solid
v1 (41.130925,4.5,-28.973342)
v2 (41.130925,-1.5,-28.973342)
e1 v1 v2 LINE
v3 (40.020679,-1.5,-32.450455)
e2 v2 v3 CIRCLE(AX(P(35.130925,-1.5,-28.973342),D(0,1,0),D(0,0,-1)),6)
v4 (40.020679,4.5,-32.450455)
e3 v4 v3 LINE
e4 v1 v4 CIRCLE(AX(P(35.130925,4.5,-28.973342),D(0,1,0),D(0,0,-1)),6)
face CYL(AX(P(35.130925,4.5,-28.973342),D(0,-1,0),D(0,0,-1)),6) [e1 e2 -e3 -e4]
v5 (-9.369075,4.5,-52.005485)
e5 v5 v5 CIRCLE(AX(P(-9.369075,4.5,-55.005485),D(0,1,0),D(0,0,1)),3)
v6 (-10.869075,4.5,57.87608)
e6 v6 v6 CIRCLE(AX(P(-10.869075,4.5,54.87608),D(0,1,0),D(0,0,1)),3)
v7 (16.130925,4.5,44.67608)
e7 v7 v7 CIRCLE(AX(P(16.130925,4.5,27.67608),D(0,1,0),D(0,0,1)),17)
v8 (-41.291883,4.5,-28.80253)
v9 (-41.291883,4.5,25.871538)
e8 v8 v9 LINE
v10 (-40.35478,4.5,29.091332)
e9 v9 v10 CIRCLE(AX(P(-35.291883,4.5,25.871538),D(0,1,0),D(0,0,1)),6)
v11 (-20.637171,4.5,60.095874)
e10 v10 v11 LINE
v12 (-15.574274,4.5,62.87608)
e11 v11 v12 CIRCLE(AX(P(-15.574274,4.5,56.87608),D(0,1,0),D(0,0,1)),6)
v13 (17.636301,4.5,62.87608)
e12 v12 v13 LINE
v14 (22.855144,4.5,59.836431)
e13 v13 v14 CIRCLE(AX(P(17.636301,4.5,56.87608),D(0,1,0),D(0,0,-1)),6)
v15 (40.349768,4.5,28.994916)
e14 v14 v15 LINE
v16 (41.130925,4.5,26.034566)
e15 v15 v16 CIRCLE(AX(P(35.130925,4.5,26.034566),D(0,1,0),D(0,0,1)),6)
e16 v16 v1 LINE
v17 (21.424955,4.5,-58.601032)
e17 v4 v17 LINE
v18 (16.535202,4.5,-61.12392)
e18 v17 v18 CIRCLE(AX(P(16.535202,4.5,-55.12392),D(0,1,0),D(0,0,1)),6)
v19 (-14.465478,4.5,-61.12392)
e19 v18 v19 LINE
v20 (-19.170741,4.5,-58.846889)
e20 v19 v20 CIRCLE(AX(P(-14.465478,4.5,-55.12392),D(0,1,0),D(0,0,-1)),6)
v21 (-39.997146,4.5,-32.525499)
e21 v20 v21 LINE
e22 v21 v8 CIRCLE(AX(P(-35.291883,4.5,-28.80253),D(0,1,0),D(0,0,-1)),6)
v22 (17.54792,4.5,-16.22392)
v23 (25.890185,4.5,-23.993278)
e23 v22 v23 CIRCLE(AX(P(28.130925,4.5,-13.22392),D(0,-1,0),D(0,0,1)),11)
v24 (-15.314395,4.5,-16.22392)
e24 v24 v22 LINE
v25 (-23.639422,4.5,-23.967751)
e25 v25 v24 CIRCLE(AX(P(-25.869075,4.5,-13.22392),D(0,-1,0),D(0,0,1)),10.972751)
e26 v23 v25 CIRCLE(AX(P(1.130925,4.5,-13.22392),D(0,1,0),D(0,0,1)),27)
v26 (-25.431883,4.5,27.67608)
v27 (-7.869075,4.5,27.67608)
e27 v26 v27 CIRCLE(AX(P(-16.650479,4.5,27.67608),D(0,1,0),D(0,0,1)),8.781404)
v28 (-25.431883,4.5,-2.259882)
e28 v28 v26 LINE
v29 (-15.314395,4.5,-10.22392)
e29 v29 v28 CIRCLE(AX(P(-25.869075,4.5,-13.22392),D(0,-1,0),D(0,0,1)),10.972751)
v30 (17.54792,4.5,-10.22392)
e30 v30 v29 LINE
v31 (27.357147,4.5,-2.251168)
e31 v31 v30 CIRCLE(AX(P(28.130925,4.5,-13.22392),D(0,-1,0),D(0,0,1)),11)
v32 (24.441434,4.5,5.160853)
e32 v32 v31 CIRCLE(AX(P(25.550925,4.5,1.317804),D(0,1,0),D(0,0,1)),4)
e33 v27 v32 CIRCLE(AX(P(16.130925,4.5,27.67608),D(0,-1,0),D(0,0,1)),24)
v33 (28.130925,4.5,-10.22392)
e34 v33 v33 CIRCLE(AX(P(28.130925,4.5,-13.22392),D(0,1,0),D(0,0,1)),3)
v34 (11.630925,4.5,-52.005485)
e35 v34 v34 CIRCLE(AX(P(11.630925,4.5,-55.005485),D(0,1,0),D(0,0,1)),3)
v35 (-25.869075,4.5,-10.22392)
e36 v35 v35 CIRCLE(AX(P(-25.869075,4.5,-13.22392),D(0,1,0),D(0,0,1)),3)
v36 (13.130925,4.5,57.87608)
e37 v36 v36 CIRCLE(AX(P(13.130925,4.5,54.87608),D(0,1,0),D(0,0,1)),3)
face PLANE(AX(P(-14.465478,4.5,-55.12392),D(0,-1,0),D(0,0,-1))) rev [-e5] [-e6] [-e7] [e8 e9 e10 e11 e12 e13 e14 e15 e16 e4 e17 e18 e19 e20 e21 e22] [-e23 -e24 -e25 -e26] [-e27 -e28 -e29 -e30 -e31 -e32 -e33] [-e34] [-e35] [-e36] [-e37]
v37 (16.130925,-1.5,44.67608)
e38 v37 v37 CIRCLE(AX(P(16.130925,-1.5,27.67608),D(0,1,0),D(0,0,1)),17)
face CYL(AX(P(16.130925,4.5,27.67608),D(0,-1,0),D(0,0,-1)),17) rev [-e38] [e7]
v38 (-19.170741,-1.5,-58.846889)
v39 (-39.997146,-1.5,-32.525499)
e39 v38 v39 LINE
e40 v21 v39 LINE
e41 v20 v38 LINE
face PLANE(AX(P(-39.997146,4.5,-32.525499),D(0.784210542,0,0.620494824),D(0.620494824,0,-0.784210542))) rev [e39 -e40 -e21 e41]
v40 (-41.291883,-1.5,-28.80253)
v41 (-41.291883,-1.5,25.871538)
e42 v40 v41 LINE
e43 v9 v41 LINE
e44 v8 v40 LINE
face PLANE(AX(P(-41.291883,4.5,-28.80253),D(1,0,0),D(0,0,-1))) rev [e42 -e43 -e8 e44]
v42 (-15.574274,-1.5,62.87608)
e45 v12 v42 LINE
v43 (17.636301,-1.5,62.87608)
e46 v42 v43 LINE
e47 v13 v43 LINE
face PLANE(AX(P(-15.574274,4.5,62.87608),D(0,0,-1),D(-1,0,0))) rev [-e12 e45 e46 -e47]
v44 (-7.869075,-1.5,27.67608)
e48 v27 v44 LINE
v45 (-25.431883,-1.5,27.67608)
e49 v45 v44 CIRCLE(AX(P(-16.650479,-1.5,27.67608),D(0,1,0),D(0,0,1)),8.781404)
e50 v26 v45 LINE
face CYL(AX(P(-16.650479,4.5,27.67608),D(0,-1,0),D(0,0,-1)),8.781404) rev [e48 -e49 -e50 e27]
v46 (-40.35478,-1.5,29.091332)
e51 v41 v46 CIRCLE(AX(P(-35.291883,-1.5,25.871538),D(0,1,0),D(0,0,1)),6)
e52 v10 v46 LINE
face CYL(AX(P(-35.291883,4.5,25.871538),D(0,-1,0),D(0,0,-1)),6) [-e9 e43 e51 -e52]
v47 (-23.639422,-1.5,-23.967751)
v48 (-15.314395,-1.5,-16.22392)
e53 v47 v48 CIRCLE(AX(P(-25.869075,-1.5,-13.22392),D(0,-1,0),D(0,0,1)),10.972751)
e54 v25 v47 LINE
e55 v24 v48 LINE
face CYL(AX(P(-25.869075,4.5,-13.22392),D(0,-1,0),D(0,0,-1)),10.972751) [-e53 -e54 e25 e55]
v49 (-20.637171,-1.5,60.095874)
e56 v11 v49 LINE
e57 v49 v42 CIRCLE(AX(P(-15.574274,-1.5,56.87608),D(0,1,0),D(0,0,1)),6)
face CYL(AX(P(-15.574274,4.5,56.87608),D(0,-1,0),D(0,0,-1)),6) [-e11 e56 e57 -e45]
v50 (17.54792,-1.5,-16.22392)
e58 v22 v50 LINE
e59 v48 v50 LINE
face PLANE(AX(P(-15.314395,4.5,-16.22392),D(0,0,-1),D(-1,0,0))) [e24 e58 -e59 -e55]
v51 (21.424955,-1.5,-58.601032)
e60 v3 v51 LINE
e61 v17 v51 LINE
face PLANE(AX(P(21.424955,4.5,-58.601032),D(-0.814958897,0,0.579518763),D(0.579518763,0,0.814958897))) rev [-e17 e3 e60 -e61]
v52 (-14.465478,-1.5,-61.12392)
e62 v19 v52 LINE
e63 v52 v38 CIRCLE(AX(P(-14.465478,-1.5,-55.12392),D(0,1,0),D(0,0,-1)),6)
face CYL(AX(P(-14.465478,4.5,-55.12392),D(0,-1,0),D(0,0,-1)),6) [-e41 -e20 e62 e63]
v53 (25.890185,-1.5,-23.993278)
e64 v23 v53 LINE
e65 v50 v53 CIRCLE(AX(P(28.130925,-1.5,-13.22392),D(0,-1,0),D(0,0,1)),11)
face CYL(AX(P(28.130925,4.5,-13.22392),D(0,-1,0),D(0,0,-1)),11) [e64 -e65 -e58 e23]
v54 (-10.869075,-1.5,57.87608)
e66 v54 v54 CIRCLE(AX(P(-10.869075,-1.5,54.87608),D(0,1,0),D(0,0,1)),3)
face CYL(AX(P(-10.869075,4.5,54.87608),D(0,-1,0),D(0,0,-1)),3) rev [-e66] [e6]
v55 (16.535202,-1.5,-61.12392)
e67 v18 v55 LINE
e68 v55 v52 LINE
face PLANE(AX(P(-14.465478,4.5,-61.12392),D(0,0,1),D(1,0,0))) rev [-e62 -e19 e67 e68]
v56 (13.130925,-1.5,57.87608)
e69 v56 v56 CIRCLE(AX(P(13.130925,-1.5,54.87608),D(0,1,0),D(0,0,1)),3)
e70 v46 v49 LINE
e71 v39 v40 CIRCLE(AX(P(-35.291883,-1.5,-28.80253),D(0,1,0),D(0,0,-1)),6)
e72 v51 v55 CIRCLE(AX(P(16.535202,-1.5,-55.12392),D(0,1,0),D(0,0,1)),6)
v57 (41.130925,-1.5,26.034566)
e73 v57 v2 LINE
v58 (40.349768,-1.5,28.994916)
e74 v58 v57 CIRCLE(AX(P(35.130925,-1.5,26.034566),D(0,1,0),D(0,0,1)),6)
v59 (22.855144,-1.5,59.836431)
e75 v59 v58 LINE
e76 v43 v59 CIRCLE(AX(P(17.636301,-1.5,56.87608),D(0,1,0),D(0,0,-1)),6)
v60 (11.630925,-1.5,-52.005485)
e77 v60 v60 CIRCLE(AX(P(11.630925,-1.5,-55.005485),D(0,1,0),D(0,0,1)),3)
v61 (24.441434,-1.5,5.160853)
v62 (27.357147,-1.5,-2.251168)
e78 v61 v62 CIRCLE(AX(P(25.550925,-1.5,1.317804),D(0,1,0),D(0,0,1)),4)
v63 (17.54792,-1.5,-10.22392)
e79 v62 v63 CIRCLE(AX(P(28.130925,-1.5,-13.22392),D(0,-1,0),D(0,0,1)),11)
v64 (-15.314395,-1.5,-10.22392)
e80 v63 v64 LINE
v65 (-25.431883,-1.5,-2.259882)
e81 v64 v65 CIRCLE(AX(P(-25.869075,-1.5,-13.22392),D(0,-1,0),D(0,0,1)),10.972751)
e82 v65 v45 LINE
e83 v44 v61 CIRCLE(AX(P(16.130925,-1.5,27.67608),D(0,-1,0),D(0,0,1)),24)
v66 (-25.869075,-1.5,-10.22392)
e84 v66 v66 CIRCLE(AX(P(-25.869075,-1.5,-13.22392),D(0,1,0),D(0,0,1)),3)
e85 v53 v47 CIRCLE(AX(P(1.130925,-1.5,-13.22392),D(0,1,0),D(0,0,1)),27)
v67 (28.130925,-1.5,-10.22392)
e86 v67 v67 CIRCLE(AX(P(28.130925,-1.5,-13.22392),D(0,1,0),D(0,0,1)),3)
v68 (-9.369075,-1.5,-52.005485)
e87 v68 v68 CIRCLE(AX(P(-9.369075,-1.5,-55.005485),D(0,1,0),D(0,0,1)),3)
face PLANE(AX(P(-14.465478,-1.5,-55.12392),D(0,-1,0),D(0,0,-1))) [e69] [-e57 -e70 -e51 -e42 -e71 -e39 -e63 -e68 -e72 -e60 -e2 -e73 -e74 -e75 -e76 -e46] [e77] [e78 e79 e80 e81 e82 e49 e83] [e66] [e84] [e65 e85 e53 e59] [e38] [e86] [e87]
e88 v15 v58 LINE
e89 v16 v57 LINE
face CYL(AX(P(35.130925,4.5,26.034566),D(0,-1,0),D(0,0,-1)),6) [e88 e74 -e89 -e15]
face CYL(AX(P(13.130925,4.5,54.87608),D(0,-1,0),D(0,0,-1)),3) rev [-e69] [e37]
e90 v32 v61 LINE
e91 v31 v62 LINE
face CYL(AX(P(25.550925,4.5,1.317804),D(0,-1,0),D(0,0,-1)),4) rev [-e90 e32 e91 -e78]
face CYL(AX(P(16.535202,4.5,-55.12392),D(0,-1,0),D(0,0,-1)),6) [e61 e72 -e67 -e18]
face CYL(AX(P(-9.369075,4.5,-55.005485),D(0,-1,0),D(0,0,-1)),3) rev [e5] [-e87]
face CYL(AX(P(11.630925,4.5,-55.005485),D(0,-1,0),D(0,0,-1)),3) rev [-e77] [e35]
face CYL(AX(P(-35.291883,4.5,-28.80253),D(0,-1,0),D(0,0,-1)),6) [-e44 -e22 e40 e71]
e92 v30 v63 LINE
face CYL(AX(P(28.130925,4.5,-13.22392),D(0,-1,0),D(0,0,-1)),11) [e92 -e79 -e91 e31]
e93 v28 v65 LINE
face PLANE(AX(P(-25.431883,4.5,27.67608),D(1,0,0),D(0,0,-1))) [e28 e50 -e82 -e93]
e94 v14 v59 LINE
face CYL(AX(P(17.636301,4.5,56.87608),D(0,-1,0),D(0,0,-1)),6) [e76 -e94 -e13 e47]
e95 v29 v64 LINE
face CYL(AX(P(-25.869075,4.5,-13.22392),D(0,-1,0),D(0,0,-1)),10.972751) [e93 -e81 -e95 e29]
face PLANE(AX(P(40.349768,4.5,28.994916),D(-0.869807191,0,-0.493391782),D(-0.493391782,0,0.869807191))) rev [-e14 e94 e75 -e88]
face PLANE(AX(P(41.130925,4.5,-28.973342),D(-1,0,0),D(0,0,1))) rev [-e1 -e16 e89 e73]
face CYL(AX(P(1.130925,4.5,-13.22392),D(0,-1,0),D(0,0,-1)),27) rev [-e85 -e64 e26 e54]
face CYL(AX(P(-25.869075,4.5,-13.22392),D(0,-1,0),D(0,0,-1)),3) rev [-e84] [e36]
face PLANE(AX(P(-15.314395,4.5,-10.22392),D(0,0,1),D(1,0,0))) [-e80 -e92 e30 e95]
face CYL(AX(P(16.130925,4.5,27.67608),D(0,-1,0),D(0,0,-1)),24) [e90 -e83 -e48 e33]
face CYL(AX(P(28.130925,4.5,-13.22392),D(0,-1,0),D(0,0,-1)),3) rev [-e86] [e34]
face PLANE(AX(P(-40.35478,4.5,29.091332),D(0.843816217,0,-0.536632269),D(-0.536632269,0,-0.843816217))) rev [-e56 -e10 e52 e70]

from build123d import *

# Parameters (mm, degrees)
SKETCH1_R          = 8.5
SKETCH1_R_2        = 1.5
BASE_FLANGE1_DEPTH = 3
L_EK1_SCALE        = 2


# Sheet-metal steps are written as plain solids
with BuildPart() as part:
    # Sketch1 → Base-Flange1 (new body)
    with BuildSketch(Plane(origin=(0, 0, 0), x_dir=(1, 0, 0), z_dir=(0, 1, 0))):
        with BuildLine():
            Line((19.609421573, -14.059417906), (10.862109445, -29.480175346))
            ThreePointArc((10.862109445, -29.480175346), (9.762567662, -30.59234701), (8.252687872, -31))
            Line((8.252687872, -31), (-8.352599575, -31))
            ThreePointArc((-8.352599575, -31), (-9.796606082, -30.629609326), (-10.884048227, -29.609896806))
            Line((-10.884048227, -29.609896806), (-20.742852548, -14.107625594))
            ThreePointArc((-20.742852548, -14.107625594), (-21.091885276, -13.336076582), (-21.211403896, -12.497728788))
            Line((-21.211403896, -12.497728788), (-21.211403896, 14.839305313))
            ThreePointArc((-21.211403896, 14.839305313), (-21.044943633, 15.824725306), (-20.564035521, 16.700789784))
            Line((-20.564035521, 16.700789784), (-10.150833328, 29.861484472))
            ThreePointArc((-10.150833328, 29.861484472), (-9.105019706, 30.700412322), (-7.798201703, 31))
            Line((-7.798201703, 31), (7.702138241, 31))
            ThreePointArc((7.702138241, 31), (9.077698333, 30.666052219), (10.147014932, 29.738556288))
            Line((10.147014932, 29.738556288), (19.444876691, 16.663267527))
            ThreePointArc((19.444876691, 16.663267527), (19.857851472, 15.837226972), (20, 14.924711239))
            Line((20, 14.924711239), (20, -12.57924256))
            ThreePointArc((20, -12.57924256), (19.900712388, -13.344662472), (19.609421573, -14.059417906))
        make_face()
        with Locations(Location((7.5, -13.4, 0), (0, 0, 270))):
            Circle(SKETCH1_R, mode=Mode.SUBTRACT)
        with Locations(Location((6, -27, 0), (0, 0, 270))):
            Circle(SKETCH1_R_2, mode=Mode.SUBTRACT)
        with Locations(Location((-6, -27, 0), (0, 0, 270))):
            Circle(SKETCH1_R_2, mode=Mode.SUBTRACT)
        with Locations(Location((5.25, 27.940782939, 0), (0, 0, 270))):
            Circle(SKETCH1_R_2, mode=Mode.SUBTRACT)
        with Locations(Location((-5.25, 27.940782939, 0), (0, 0, 270))):
            Circle(SKETCH1_R_2, mode=Mode.SUBTRACT)
        with Locations(Location((13.5, 7.05, 0), (0, 0, 270))):
            Circle(SKETCH1_R_2, mode=Mode.SUBTRACT)
        with Locations(Location((-13.5, 7.05, 0), (0, 0, 270))):
            Circle(SKETCH1_R_2, mode=Mode.SUBTRACT)
        with BuildLine():
            Line((-13.281403896, 0), (-13.281403896, 1.567980996))
            ThreePointArc((-13.281403896, 1.567980996), (-10.106558233, 2.738982767), (-8.222660082, 5.55))
            Line((-8.222660082, 5.55), (8.208497378, 5.55))
            ThreePointArc((8.208497378, 5.55), (10.031018679, 2.781959631), (13.113110627, 1.563624456))
            ThreePointArc((13.113110627, 1.563624456), (14.07117407, -0.953003234), (11.655254401, -2.142386538))
            ThreePointArc((11.655254401, -2.142386538), (0.639353267, -3.554619032), (-4.5, -13.4))
            ThreePointArc((-4.5, -13.4), (-8.890701948, -17.790701948), (-13.281403896, -13.4))
            Line((-13.281403896, -13.4), (-13.281403896, 0))
        make_face(mode=Mode.SUBTRACT)
        with BuildLine():
            Line((-8.222660082, 8.55), (8.208497378, 8.55))
            ThreePointArc((8.208497378, 8.55), (9.751572067, 11.074833914), (12.37962963, 12.434679214))
            ThreePointArc((12.37962963, 12.434679214), (-0.006957749, 20.549998207), (-12.385173459, 12.42191571))
            ThreePointArc((-12.385173459, 12.42191571), (-9.763306163, 11.067142739), (-8.222660082, 8.55))
        make_face(mode=Mode.SUBTRACT)
    extrude(amount=BASE_FLANGE1_DEPTH)


with BuildPart() as part_1:
    # Ölçek1: scaled about (-1.130925292, 1.5, -0.876080417)
    add(part.part.scale(L_EK1_SCALE).moved(Location((1.130925292, -1.5, 0.876080417))))


solid = part_1.part
